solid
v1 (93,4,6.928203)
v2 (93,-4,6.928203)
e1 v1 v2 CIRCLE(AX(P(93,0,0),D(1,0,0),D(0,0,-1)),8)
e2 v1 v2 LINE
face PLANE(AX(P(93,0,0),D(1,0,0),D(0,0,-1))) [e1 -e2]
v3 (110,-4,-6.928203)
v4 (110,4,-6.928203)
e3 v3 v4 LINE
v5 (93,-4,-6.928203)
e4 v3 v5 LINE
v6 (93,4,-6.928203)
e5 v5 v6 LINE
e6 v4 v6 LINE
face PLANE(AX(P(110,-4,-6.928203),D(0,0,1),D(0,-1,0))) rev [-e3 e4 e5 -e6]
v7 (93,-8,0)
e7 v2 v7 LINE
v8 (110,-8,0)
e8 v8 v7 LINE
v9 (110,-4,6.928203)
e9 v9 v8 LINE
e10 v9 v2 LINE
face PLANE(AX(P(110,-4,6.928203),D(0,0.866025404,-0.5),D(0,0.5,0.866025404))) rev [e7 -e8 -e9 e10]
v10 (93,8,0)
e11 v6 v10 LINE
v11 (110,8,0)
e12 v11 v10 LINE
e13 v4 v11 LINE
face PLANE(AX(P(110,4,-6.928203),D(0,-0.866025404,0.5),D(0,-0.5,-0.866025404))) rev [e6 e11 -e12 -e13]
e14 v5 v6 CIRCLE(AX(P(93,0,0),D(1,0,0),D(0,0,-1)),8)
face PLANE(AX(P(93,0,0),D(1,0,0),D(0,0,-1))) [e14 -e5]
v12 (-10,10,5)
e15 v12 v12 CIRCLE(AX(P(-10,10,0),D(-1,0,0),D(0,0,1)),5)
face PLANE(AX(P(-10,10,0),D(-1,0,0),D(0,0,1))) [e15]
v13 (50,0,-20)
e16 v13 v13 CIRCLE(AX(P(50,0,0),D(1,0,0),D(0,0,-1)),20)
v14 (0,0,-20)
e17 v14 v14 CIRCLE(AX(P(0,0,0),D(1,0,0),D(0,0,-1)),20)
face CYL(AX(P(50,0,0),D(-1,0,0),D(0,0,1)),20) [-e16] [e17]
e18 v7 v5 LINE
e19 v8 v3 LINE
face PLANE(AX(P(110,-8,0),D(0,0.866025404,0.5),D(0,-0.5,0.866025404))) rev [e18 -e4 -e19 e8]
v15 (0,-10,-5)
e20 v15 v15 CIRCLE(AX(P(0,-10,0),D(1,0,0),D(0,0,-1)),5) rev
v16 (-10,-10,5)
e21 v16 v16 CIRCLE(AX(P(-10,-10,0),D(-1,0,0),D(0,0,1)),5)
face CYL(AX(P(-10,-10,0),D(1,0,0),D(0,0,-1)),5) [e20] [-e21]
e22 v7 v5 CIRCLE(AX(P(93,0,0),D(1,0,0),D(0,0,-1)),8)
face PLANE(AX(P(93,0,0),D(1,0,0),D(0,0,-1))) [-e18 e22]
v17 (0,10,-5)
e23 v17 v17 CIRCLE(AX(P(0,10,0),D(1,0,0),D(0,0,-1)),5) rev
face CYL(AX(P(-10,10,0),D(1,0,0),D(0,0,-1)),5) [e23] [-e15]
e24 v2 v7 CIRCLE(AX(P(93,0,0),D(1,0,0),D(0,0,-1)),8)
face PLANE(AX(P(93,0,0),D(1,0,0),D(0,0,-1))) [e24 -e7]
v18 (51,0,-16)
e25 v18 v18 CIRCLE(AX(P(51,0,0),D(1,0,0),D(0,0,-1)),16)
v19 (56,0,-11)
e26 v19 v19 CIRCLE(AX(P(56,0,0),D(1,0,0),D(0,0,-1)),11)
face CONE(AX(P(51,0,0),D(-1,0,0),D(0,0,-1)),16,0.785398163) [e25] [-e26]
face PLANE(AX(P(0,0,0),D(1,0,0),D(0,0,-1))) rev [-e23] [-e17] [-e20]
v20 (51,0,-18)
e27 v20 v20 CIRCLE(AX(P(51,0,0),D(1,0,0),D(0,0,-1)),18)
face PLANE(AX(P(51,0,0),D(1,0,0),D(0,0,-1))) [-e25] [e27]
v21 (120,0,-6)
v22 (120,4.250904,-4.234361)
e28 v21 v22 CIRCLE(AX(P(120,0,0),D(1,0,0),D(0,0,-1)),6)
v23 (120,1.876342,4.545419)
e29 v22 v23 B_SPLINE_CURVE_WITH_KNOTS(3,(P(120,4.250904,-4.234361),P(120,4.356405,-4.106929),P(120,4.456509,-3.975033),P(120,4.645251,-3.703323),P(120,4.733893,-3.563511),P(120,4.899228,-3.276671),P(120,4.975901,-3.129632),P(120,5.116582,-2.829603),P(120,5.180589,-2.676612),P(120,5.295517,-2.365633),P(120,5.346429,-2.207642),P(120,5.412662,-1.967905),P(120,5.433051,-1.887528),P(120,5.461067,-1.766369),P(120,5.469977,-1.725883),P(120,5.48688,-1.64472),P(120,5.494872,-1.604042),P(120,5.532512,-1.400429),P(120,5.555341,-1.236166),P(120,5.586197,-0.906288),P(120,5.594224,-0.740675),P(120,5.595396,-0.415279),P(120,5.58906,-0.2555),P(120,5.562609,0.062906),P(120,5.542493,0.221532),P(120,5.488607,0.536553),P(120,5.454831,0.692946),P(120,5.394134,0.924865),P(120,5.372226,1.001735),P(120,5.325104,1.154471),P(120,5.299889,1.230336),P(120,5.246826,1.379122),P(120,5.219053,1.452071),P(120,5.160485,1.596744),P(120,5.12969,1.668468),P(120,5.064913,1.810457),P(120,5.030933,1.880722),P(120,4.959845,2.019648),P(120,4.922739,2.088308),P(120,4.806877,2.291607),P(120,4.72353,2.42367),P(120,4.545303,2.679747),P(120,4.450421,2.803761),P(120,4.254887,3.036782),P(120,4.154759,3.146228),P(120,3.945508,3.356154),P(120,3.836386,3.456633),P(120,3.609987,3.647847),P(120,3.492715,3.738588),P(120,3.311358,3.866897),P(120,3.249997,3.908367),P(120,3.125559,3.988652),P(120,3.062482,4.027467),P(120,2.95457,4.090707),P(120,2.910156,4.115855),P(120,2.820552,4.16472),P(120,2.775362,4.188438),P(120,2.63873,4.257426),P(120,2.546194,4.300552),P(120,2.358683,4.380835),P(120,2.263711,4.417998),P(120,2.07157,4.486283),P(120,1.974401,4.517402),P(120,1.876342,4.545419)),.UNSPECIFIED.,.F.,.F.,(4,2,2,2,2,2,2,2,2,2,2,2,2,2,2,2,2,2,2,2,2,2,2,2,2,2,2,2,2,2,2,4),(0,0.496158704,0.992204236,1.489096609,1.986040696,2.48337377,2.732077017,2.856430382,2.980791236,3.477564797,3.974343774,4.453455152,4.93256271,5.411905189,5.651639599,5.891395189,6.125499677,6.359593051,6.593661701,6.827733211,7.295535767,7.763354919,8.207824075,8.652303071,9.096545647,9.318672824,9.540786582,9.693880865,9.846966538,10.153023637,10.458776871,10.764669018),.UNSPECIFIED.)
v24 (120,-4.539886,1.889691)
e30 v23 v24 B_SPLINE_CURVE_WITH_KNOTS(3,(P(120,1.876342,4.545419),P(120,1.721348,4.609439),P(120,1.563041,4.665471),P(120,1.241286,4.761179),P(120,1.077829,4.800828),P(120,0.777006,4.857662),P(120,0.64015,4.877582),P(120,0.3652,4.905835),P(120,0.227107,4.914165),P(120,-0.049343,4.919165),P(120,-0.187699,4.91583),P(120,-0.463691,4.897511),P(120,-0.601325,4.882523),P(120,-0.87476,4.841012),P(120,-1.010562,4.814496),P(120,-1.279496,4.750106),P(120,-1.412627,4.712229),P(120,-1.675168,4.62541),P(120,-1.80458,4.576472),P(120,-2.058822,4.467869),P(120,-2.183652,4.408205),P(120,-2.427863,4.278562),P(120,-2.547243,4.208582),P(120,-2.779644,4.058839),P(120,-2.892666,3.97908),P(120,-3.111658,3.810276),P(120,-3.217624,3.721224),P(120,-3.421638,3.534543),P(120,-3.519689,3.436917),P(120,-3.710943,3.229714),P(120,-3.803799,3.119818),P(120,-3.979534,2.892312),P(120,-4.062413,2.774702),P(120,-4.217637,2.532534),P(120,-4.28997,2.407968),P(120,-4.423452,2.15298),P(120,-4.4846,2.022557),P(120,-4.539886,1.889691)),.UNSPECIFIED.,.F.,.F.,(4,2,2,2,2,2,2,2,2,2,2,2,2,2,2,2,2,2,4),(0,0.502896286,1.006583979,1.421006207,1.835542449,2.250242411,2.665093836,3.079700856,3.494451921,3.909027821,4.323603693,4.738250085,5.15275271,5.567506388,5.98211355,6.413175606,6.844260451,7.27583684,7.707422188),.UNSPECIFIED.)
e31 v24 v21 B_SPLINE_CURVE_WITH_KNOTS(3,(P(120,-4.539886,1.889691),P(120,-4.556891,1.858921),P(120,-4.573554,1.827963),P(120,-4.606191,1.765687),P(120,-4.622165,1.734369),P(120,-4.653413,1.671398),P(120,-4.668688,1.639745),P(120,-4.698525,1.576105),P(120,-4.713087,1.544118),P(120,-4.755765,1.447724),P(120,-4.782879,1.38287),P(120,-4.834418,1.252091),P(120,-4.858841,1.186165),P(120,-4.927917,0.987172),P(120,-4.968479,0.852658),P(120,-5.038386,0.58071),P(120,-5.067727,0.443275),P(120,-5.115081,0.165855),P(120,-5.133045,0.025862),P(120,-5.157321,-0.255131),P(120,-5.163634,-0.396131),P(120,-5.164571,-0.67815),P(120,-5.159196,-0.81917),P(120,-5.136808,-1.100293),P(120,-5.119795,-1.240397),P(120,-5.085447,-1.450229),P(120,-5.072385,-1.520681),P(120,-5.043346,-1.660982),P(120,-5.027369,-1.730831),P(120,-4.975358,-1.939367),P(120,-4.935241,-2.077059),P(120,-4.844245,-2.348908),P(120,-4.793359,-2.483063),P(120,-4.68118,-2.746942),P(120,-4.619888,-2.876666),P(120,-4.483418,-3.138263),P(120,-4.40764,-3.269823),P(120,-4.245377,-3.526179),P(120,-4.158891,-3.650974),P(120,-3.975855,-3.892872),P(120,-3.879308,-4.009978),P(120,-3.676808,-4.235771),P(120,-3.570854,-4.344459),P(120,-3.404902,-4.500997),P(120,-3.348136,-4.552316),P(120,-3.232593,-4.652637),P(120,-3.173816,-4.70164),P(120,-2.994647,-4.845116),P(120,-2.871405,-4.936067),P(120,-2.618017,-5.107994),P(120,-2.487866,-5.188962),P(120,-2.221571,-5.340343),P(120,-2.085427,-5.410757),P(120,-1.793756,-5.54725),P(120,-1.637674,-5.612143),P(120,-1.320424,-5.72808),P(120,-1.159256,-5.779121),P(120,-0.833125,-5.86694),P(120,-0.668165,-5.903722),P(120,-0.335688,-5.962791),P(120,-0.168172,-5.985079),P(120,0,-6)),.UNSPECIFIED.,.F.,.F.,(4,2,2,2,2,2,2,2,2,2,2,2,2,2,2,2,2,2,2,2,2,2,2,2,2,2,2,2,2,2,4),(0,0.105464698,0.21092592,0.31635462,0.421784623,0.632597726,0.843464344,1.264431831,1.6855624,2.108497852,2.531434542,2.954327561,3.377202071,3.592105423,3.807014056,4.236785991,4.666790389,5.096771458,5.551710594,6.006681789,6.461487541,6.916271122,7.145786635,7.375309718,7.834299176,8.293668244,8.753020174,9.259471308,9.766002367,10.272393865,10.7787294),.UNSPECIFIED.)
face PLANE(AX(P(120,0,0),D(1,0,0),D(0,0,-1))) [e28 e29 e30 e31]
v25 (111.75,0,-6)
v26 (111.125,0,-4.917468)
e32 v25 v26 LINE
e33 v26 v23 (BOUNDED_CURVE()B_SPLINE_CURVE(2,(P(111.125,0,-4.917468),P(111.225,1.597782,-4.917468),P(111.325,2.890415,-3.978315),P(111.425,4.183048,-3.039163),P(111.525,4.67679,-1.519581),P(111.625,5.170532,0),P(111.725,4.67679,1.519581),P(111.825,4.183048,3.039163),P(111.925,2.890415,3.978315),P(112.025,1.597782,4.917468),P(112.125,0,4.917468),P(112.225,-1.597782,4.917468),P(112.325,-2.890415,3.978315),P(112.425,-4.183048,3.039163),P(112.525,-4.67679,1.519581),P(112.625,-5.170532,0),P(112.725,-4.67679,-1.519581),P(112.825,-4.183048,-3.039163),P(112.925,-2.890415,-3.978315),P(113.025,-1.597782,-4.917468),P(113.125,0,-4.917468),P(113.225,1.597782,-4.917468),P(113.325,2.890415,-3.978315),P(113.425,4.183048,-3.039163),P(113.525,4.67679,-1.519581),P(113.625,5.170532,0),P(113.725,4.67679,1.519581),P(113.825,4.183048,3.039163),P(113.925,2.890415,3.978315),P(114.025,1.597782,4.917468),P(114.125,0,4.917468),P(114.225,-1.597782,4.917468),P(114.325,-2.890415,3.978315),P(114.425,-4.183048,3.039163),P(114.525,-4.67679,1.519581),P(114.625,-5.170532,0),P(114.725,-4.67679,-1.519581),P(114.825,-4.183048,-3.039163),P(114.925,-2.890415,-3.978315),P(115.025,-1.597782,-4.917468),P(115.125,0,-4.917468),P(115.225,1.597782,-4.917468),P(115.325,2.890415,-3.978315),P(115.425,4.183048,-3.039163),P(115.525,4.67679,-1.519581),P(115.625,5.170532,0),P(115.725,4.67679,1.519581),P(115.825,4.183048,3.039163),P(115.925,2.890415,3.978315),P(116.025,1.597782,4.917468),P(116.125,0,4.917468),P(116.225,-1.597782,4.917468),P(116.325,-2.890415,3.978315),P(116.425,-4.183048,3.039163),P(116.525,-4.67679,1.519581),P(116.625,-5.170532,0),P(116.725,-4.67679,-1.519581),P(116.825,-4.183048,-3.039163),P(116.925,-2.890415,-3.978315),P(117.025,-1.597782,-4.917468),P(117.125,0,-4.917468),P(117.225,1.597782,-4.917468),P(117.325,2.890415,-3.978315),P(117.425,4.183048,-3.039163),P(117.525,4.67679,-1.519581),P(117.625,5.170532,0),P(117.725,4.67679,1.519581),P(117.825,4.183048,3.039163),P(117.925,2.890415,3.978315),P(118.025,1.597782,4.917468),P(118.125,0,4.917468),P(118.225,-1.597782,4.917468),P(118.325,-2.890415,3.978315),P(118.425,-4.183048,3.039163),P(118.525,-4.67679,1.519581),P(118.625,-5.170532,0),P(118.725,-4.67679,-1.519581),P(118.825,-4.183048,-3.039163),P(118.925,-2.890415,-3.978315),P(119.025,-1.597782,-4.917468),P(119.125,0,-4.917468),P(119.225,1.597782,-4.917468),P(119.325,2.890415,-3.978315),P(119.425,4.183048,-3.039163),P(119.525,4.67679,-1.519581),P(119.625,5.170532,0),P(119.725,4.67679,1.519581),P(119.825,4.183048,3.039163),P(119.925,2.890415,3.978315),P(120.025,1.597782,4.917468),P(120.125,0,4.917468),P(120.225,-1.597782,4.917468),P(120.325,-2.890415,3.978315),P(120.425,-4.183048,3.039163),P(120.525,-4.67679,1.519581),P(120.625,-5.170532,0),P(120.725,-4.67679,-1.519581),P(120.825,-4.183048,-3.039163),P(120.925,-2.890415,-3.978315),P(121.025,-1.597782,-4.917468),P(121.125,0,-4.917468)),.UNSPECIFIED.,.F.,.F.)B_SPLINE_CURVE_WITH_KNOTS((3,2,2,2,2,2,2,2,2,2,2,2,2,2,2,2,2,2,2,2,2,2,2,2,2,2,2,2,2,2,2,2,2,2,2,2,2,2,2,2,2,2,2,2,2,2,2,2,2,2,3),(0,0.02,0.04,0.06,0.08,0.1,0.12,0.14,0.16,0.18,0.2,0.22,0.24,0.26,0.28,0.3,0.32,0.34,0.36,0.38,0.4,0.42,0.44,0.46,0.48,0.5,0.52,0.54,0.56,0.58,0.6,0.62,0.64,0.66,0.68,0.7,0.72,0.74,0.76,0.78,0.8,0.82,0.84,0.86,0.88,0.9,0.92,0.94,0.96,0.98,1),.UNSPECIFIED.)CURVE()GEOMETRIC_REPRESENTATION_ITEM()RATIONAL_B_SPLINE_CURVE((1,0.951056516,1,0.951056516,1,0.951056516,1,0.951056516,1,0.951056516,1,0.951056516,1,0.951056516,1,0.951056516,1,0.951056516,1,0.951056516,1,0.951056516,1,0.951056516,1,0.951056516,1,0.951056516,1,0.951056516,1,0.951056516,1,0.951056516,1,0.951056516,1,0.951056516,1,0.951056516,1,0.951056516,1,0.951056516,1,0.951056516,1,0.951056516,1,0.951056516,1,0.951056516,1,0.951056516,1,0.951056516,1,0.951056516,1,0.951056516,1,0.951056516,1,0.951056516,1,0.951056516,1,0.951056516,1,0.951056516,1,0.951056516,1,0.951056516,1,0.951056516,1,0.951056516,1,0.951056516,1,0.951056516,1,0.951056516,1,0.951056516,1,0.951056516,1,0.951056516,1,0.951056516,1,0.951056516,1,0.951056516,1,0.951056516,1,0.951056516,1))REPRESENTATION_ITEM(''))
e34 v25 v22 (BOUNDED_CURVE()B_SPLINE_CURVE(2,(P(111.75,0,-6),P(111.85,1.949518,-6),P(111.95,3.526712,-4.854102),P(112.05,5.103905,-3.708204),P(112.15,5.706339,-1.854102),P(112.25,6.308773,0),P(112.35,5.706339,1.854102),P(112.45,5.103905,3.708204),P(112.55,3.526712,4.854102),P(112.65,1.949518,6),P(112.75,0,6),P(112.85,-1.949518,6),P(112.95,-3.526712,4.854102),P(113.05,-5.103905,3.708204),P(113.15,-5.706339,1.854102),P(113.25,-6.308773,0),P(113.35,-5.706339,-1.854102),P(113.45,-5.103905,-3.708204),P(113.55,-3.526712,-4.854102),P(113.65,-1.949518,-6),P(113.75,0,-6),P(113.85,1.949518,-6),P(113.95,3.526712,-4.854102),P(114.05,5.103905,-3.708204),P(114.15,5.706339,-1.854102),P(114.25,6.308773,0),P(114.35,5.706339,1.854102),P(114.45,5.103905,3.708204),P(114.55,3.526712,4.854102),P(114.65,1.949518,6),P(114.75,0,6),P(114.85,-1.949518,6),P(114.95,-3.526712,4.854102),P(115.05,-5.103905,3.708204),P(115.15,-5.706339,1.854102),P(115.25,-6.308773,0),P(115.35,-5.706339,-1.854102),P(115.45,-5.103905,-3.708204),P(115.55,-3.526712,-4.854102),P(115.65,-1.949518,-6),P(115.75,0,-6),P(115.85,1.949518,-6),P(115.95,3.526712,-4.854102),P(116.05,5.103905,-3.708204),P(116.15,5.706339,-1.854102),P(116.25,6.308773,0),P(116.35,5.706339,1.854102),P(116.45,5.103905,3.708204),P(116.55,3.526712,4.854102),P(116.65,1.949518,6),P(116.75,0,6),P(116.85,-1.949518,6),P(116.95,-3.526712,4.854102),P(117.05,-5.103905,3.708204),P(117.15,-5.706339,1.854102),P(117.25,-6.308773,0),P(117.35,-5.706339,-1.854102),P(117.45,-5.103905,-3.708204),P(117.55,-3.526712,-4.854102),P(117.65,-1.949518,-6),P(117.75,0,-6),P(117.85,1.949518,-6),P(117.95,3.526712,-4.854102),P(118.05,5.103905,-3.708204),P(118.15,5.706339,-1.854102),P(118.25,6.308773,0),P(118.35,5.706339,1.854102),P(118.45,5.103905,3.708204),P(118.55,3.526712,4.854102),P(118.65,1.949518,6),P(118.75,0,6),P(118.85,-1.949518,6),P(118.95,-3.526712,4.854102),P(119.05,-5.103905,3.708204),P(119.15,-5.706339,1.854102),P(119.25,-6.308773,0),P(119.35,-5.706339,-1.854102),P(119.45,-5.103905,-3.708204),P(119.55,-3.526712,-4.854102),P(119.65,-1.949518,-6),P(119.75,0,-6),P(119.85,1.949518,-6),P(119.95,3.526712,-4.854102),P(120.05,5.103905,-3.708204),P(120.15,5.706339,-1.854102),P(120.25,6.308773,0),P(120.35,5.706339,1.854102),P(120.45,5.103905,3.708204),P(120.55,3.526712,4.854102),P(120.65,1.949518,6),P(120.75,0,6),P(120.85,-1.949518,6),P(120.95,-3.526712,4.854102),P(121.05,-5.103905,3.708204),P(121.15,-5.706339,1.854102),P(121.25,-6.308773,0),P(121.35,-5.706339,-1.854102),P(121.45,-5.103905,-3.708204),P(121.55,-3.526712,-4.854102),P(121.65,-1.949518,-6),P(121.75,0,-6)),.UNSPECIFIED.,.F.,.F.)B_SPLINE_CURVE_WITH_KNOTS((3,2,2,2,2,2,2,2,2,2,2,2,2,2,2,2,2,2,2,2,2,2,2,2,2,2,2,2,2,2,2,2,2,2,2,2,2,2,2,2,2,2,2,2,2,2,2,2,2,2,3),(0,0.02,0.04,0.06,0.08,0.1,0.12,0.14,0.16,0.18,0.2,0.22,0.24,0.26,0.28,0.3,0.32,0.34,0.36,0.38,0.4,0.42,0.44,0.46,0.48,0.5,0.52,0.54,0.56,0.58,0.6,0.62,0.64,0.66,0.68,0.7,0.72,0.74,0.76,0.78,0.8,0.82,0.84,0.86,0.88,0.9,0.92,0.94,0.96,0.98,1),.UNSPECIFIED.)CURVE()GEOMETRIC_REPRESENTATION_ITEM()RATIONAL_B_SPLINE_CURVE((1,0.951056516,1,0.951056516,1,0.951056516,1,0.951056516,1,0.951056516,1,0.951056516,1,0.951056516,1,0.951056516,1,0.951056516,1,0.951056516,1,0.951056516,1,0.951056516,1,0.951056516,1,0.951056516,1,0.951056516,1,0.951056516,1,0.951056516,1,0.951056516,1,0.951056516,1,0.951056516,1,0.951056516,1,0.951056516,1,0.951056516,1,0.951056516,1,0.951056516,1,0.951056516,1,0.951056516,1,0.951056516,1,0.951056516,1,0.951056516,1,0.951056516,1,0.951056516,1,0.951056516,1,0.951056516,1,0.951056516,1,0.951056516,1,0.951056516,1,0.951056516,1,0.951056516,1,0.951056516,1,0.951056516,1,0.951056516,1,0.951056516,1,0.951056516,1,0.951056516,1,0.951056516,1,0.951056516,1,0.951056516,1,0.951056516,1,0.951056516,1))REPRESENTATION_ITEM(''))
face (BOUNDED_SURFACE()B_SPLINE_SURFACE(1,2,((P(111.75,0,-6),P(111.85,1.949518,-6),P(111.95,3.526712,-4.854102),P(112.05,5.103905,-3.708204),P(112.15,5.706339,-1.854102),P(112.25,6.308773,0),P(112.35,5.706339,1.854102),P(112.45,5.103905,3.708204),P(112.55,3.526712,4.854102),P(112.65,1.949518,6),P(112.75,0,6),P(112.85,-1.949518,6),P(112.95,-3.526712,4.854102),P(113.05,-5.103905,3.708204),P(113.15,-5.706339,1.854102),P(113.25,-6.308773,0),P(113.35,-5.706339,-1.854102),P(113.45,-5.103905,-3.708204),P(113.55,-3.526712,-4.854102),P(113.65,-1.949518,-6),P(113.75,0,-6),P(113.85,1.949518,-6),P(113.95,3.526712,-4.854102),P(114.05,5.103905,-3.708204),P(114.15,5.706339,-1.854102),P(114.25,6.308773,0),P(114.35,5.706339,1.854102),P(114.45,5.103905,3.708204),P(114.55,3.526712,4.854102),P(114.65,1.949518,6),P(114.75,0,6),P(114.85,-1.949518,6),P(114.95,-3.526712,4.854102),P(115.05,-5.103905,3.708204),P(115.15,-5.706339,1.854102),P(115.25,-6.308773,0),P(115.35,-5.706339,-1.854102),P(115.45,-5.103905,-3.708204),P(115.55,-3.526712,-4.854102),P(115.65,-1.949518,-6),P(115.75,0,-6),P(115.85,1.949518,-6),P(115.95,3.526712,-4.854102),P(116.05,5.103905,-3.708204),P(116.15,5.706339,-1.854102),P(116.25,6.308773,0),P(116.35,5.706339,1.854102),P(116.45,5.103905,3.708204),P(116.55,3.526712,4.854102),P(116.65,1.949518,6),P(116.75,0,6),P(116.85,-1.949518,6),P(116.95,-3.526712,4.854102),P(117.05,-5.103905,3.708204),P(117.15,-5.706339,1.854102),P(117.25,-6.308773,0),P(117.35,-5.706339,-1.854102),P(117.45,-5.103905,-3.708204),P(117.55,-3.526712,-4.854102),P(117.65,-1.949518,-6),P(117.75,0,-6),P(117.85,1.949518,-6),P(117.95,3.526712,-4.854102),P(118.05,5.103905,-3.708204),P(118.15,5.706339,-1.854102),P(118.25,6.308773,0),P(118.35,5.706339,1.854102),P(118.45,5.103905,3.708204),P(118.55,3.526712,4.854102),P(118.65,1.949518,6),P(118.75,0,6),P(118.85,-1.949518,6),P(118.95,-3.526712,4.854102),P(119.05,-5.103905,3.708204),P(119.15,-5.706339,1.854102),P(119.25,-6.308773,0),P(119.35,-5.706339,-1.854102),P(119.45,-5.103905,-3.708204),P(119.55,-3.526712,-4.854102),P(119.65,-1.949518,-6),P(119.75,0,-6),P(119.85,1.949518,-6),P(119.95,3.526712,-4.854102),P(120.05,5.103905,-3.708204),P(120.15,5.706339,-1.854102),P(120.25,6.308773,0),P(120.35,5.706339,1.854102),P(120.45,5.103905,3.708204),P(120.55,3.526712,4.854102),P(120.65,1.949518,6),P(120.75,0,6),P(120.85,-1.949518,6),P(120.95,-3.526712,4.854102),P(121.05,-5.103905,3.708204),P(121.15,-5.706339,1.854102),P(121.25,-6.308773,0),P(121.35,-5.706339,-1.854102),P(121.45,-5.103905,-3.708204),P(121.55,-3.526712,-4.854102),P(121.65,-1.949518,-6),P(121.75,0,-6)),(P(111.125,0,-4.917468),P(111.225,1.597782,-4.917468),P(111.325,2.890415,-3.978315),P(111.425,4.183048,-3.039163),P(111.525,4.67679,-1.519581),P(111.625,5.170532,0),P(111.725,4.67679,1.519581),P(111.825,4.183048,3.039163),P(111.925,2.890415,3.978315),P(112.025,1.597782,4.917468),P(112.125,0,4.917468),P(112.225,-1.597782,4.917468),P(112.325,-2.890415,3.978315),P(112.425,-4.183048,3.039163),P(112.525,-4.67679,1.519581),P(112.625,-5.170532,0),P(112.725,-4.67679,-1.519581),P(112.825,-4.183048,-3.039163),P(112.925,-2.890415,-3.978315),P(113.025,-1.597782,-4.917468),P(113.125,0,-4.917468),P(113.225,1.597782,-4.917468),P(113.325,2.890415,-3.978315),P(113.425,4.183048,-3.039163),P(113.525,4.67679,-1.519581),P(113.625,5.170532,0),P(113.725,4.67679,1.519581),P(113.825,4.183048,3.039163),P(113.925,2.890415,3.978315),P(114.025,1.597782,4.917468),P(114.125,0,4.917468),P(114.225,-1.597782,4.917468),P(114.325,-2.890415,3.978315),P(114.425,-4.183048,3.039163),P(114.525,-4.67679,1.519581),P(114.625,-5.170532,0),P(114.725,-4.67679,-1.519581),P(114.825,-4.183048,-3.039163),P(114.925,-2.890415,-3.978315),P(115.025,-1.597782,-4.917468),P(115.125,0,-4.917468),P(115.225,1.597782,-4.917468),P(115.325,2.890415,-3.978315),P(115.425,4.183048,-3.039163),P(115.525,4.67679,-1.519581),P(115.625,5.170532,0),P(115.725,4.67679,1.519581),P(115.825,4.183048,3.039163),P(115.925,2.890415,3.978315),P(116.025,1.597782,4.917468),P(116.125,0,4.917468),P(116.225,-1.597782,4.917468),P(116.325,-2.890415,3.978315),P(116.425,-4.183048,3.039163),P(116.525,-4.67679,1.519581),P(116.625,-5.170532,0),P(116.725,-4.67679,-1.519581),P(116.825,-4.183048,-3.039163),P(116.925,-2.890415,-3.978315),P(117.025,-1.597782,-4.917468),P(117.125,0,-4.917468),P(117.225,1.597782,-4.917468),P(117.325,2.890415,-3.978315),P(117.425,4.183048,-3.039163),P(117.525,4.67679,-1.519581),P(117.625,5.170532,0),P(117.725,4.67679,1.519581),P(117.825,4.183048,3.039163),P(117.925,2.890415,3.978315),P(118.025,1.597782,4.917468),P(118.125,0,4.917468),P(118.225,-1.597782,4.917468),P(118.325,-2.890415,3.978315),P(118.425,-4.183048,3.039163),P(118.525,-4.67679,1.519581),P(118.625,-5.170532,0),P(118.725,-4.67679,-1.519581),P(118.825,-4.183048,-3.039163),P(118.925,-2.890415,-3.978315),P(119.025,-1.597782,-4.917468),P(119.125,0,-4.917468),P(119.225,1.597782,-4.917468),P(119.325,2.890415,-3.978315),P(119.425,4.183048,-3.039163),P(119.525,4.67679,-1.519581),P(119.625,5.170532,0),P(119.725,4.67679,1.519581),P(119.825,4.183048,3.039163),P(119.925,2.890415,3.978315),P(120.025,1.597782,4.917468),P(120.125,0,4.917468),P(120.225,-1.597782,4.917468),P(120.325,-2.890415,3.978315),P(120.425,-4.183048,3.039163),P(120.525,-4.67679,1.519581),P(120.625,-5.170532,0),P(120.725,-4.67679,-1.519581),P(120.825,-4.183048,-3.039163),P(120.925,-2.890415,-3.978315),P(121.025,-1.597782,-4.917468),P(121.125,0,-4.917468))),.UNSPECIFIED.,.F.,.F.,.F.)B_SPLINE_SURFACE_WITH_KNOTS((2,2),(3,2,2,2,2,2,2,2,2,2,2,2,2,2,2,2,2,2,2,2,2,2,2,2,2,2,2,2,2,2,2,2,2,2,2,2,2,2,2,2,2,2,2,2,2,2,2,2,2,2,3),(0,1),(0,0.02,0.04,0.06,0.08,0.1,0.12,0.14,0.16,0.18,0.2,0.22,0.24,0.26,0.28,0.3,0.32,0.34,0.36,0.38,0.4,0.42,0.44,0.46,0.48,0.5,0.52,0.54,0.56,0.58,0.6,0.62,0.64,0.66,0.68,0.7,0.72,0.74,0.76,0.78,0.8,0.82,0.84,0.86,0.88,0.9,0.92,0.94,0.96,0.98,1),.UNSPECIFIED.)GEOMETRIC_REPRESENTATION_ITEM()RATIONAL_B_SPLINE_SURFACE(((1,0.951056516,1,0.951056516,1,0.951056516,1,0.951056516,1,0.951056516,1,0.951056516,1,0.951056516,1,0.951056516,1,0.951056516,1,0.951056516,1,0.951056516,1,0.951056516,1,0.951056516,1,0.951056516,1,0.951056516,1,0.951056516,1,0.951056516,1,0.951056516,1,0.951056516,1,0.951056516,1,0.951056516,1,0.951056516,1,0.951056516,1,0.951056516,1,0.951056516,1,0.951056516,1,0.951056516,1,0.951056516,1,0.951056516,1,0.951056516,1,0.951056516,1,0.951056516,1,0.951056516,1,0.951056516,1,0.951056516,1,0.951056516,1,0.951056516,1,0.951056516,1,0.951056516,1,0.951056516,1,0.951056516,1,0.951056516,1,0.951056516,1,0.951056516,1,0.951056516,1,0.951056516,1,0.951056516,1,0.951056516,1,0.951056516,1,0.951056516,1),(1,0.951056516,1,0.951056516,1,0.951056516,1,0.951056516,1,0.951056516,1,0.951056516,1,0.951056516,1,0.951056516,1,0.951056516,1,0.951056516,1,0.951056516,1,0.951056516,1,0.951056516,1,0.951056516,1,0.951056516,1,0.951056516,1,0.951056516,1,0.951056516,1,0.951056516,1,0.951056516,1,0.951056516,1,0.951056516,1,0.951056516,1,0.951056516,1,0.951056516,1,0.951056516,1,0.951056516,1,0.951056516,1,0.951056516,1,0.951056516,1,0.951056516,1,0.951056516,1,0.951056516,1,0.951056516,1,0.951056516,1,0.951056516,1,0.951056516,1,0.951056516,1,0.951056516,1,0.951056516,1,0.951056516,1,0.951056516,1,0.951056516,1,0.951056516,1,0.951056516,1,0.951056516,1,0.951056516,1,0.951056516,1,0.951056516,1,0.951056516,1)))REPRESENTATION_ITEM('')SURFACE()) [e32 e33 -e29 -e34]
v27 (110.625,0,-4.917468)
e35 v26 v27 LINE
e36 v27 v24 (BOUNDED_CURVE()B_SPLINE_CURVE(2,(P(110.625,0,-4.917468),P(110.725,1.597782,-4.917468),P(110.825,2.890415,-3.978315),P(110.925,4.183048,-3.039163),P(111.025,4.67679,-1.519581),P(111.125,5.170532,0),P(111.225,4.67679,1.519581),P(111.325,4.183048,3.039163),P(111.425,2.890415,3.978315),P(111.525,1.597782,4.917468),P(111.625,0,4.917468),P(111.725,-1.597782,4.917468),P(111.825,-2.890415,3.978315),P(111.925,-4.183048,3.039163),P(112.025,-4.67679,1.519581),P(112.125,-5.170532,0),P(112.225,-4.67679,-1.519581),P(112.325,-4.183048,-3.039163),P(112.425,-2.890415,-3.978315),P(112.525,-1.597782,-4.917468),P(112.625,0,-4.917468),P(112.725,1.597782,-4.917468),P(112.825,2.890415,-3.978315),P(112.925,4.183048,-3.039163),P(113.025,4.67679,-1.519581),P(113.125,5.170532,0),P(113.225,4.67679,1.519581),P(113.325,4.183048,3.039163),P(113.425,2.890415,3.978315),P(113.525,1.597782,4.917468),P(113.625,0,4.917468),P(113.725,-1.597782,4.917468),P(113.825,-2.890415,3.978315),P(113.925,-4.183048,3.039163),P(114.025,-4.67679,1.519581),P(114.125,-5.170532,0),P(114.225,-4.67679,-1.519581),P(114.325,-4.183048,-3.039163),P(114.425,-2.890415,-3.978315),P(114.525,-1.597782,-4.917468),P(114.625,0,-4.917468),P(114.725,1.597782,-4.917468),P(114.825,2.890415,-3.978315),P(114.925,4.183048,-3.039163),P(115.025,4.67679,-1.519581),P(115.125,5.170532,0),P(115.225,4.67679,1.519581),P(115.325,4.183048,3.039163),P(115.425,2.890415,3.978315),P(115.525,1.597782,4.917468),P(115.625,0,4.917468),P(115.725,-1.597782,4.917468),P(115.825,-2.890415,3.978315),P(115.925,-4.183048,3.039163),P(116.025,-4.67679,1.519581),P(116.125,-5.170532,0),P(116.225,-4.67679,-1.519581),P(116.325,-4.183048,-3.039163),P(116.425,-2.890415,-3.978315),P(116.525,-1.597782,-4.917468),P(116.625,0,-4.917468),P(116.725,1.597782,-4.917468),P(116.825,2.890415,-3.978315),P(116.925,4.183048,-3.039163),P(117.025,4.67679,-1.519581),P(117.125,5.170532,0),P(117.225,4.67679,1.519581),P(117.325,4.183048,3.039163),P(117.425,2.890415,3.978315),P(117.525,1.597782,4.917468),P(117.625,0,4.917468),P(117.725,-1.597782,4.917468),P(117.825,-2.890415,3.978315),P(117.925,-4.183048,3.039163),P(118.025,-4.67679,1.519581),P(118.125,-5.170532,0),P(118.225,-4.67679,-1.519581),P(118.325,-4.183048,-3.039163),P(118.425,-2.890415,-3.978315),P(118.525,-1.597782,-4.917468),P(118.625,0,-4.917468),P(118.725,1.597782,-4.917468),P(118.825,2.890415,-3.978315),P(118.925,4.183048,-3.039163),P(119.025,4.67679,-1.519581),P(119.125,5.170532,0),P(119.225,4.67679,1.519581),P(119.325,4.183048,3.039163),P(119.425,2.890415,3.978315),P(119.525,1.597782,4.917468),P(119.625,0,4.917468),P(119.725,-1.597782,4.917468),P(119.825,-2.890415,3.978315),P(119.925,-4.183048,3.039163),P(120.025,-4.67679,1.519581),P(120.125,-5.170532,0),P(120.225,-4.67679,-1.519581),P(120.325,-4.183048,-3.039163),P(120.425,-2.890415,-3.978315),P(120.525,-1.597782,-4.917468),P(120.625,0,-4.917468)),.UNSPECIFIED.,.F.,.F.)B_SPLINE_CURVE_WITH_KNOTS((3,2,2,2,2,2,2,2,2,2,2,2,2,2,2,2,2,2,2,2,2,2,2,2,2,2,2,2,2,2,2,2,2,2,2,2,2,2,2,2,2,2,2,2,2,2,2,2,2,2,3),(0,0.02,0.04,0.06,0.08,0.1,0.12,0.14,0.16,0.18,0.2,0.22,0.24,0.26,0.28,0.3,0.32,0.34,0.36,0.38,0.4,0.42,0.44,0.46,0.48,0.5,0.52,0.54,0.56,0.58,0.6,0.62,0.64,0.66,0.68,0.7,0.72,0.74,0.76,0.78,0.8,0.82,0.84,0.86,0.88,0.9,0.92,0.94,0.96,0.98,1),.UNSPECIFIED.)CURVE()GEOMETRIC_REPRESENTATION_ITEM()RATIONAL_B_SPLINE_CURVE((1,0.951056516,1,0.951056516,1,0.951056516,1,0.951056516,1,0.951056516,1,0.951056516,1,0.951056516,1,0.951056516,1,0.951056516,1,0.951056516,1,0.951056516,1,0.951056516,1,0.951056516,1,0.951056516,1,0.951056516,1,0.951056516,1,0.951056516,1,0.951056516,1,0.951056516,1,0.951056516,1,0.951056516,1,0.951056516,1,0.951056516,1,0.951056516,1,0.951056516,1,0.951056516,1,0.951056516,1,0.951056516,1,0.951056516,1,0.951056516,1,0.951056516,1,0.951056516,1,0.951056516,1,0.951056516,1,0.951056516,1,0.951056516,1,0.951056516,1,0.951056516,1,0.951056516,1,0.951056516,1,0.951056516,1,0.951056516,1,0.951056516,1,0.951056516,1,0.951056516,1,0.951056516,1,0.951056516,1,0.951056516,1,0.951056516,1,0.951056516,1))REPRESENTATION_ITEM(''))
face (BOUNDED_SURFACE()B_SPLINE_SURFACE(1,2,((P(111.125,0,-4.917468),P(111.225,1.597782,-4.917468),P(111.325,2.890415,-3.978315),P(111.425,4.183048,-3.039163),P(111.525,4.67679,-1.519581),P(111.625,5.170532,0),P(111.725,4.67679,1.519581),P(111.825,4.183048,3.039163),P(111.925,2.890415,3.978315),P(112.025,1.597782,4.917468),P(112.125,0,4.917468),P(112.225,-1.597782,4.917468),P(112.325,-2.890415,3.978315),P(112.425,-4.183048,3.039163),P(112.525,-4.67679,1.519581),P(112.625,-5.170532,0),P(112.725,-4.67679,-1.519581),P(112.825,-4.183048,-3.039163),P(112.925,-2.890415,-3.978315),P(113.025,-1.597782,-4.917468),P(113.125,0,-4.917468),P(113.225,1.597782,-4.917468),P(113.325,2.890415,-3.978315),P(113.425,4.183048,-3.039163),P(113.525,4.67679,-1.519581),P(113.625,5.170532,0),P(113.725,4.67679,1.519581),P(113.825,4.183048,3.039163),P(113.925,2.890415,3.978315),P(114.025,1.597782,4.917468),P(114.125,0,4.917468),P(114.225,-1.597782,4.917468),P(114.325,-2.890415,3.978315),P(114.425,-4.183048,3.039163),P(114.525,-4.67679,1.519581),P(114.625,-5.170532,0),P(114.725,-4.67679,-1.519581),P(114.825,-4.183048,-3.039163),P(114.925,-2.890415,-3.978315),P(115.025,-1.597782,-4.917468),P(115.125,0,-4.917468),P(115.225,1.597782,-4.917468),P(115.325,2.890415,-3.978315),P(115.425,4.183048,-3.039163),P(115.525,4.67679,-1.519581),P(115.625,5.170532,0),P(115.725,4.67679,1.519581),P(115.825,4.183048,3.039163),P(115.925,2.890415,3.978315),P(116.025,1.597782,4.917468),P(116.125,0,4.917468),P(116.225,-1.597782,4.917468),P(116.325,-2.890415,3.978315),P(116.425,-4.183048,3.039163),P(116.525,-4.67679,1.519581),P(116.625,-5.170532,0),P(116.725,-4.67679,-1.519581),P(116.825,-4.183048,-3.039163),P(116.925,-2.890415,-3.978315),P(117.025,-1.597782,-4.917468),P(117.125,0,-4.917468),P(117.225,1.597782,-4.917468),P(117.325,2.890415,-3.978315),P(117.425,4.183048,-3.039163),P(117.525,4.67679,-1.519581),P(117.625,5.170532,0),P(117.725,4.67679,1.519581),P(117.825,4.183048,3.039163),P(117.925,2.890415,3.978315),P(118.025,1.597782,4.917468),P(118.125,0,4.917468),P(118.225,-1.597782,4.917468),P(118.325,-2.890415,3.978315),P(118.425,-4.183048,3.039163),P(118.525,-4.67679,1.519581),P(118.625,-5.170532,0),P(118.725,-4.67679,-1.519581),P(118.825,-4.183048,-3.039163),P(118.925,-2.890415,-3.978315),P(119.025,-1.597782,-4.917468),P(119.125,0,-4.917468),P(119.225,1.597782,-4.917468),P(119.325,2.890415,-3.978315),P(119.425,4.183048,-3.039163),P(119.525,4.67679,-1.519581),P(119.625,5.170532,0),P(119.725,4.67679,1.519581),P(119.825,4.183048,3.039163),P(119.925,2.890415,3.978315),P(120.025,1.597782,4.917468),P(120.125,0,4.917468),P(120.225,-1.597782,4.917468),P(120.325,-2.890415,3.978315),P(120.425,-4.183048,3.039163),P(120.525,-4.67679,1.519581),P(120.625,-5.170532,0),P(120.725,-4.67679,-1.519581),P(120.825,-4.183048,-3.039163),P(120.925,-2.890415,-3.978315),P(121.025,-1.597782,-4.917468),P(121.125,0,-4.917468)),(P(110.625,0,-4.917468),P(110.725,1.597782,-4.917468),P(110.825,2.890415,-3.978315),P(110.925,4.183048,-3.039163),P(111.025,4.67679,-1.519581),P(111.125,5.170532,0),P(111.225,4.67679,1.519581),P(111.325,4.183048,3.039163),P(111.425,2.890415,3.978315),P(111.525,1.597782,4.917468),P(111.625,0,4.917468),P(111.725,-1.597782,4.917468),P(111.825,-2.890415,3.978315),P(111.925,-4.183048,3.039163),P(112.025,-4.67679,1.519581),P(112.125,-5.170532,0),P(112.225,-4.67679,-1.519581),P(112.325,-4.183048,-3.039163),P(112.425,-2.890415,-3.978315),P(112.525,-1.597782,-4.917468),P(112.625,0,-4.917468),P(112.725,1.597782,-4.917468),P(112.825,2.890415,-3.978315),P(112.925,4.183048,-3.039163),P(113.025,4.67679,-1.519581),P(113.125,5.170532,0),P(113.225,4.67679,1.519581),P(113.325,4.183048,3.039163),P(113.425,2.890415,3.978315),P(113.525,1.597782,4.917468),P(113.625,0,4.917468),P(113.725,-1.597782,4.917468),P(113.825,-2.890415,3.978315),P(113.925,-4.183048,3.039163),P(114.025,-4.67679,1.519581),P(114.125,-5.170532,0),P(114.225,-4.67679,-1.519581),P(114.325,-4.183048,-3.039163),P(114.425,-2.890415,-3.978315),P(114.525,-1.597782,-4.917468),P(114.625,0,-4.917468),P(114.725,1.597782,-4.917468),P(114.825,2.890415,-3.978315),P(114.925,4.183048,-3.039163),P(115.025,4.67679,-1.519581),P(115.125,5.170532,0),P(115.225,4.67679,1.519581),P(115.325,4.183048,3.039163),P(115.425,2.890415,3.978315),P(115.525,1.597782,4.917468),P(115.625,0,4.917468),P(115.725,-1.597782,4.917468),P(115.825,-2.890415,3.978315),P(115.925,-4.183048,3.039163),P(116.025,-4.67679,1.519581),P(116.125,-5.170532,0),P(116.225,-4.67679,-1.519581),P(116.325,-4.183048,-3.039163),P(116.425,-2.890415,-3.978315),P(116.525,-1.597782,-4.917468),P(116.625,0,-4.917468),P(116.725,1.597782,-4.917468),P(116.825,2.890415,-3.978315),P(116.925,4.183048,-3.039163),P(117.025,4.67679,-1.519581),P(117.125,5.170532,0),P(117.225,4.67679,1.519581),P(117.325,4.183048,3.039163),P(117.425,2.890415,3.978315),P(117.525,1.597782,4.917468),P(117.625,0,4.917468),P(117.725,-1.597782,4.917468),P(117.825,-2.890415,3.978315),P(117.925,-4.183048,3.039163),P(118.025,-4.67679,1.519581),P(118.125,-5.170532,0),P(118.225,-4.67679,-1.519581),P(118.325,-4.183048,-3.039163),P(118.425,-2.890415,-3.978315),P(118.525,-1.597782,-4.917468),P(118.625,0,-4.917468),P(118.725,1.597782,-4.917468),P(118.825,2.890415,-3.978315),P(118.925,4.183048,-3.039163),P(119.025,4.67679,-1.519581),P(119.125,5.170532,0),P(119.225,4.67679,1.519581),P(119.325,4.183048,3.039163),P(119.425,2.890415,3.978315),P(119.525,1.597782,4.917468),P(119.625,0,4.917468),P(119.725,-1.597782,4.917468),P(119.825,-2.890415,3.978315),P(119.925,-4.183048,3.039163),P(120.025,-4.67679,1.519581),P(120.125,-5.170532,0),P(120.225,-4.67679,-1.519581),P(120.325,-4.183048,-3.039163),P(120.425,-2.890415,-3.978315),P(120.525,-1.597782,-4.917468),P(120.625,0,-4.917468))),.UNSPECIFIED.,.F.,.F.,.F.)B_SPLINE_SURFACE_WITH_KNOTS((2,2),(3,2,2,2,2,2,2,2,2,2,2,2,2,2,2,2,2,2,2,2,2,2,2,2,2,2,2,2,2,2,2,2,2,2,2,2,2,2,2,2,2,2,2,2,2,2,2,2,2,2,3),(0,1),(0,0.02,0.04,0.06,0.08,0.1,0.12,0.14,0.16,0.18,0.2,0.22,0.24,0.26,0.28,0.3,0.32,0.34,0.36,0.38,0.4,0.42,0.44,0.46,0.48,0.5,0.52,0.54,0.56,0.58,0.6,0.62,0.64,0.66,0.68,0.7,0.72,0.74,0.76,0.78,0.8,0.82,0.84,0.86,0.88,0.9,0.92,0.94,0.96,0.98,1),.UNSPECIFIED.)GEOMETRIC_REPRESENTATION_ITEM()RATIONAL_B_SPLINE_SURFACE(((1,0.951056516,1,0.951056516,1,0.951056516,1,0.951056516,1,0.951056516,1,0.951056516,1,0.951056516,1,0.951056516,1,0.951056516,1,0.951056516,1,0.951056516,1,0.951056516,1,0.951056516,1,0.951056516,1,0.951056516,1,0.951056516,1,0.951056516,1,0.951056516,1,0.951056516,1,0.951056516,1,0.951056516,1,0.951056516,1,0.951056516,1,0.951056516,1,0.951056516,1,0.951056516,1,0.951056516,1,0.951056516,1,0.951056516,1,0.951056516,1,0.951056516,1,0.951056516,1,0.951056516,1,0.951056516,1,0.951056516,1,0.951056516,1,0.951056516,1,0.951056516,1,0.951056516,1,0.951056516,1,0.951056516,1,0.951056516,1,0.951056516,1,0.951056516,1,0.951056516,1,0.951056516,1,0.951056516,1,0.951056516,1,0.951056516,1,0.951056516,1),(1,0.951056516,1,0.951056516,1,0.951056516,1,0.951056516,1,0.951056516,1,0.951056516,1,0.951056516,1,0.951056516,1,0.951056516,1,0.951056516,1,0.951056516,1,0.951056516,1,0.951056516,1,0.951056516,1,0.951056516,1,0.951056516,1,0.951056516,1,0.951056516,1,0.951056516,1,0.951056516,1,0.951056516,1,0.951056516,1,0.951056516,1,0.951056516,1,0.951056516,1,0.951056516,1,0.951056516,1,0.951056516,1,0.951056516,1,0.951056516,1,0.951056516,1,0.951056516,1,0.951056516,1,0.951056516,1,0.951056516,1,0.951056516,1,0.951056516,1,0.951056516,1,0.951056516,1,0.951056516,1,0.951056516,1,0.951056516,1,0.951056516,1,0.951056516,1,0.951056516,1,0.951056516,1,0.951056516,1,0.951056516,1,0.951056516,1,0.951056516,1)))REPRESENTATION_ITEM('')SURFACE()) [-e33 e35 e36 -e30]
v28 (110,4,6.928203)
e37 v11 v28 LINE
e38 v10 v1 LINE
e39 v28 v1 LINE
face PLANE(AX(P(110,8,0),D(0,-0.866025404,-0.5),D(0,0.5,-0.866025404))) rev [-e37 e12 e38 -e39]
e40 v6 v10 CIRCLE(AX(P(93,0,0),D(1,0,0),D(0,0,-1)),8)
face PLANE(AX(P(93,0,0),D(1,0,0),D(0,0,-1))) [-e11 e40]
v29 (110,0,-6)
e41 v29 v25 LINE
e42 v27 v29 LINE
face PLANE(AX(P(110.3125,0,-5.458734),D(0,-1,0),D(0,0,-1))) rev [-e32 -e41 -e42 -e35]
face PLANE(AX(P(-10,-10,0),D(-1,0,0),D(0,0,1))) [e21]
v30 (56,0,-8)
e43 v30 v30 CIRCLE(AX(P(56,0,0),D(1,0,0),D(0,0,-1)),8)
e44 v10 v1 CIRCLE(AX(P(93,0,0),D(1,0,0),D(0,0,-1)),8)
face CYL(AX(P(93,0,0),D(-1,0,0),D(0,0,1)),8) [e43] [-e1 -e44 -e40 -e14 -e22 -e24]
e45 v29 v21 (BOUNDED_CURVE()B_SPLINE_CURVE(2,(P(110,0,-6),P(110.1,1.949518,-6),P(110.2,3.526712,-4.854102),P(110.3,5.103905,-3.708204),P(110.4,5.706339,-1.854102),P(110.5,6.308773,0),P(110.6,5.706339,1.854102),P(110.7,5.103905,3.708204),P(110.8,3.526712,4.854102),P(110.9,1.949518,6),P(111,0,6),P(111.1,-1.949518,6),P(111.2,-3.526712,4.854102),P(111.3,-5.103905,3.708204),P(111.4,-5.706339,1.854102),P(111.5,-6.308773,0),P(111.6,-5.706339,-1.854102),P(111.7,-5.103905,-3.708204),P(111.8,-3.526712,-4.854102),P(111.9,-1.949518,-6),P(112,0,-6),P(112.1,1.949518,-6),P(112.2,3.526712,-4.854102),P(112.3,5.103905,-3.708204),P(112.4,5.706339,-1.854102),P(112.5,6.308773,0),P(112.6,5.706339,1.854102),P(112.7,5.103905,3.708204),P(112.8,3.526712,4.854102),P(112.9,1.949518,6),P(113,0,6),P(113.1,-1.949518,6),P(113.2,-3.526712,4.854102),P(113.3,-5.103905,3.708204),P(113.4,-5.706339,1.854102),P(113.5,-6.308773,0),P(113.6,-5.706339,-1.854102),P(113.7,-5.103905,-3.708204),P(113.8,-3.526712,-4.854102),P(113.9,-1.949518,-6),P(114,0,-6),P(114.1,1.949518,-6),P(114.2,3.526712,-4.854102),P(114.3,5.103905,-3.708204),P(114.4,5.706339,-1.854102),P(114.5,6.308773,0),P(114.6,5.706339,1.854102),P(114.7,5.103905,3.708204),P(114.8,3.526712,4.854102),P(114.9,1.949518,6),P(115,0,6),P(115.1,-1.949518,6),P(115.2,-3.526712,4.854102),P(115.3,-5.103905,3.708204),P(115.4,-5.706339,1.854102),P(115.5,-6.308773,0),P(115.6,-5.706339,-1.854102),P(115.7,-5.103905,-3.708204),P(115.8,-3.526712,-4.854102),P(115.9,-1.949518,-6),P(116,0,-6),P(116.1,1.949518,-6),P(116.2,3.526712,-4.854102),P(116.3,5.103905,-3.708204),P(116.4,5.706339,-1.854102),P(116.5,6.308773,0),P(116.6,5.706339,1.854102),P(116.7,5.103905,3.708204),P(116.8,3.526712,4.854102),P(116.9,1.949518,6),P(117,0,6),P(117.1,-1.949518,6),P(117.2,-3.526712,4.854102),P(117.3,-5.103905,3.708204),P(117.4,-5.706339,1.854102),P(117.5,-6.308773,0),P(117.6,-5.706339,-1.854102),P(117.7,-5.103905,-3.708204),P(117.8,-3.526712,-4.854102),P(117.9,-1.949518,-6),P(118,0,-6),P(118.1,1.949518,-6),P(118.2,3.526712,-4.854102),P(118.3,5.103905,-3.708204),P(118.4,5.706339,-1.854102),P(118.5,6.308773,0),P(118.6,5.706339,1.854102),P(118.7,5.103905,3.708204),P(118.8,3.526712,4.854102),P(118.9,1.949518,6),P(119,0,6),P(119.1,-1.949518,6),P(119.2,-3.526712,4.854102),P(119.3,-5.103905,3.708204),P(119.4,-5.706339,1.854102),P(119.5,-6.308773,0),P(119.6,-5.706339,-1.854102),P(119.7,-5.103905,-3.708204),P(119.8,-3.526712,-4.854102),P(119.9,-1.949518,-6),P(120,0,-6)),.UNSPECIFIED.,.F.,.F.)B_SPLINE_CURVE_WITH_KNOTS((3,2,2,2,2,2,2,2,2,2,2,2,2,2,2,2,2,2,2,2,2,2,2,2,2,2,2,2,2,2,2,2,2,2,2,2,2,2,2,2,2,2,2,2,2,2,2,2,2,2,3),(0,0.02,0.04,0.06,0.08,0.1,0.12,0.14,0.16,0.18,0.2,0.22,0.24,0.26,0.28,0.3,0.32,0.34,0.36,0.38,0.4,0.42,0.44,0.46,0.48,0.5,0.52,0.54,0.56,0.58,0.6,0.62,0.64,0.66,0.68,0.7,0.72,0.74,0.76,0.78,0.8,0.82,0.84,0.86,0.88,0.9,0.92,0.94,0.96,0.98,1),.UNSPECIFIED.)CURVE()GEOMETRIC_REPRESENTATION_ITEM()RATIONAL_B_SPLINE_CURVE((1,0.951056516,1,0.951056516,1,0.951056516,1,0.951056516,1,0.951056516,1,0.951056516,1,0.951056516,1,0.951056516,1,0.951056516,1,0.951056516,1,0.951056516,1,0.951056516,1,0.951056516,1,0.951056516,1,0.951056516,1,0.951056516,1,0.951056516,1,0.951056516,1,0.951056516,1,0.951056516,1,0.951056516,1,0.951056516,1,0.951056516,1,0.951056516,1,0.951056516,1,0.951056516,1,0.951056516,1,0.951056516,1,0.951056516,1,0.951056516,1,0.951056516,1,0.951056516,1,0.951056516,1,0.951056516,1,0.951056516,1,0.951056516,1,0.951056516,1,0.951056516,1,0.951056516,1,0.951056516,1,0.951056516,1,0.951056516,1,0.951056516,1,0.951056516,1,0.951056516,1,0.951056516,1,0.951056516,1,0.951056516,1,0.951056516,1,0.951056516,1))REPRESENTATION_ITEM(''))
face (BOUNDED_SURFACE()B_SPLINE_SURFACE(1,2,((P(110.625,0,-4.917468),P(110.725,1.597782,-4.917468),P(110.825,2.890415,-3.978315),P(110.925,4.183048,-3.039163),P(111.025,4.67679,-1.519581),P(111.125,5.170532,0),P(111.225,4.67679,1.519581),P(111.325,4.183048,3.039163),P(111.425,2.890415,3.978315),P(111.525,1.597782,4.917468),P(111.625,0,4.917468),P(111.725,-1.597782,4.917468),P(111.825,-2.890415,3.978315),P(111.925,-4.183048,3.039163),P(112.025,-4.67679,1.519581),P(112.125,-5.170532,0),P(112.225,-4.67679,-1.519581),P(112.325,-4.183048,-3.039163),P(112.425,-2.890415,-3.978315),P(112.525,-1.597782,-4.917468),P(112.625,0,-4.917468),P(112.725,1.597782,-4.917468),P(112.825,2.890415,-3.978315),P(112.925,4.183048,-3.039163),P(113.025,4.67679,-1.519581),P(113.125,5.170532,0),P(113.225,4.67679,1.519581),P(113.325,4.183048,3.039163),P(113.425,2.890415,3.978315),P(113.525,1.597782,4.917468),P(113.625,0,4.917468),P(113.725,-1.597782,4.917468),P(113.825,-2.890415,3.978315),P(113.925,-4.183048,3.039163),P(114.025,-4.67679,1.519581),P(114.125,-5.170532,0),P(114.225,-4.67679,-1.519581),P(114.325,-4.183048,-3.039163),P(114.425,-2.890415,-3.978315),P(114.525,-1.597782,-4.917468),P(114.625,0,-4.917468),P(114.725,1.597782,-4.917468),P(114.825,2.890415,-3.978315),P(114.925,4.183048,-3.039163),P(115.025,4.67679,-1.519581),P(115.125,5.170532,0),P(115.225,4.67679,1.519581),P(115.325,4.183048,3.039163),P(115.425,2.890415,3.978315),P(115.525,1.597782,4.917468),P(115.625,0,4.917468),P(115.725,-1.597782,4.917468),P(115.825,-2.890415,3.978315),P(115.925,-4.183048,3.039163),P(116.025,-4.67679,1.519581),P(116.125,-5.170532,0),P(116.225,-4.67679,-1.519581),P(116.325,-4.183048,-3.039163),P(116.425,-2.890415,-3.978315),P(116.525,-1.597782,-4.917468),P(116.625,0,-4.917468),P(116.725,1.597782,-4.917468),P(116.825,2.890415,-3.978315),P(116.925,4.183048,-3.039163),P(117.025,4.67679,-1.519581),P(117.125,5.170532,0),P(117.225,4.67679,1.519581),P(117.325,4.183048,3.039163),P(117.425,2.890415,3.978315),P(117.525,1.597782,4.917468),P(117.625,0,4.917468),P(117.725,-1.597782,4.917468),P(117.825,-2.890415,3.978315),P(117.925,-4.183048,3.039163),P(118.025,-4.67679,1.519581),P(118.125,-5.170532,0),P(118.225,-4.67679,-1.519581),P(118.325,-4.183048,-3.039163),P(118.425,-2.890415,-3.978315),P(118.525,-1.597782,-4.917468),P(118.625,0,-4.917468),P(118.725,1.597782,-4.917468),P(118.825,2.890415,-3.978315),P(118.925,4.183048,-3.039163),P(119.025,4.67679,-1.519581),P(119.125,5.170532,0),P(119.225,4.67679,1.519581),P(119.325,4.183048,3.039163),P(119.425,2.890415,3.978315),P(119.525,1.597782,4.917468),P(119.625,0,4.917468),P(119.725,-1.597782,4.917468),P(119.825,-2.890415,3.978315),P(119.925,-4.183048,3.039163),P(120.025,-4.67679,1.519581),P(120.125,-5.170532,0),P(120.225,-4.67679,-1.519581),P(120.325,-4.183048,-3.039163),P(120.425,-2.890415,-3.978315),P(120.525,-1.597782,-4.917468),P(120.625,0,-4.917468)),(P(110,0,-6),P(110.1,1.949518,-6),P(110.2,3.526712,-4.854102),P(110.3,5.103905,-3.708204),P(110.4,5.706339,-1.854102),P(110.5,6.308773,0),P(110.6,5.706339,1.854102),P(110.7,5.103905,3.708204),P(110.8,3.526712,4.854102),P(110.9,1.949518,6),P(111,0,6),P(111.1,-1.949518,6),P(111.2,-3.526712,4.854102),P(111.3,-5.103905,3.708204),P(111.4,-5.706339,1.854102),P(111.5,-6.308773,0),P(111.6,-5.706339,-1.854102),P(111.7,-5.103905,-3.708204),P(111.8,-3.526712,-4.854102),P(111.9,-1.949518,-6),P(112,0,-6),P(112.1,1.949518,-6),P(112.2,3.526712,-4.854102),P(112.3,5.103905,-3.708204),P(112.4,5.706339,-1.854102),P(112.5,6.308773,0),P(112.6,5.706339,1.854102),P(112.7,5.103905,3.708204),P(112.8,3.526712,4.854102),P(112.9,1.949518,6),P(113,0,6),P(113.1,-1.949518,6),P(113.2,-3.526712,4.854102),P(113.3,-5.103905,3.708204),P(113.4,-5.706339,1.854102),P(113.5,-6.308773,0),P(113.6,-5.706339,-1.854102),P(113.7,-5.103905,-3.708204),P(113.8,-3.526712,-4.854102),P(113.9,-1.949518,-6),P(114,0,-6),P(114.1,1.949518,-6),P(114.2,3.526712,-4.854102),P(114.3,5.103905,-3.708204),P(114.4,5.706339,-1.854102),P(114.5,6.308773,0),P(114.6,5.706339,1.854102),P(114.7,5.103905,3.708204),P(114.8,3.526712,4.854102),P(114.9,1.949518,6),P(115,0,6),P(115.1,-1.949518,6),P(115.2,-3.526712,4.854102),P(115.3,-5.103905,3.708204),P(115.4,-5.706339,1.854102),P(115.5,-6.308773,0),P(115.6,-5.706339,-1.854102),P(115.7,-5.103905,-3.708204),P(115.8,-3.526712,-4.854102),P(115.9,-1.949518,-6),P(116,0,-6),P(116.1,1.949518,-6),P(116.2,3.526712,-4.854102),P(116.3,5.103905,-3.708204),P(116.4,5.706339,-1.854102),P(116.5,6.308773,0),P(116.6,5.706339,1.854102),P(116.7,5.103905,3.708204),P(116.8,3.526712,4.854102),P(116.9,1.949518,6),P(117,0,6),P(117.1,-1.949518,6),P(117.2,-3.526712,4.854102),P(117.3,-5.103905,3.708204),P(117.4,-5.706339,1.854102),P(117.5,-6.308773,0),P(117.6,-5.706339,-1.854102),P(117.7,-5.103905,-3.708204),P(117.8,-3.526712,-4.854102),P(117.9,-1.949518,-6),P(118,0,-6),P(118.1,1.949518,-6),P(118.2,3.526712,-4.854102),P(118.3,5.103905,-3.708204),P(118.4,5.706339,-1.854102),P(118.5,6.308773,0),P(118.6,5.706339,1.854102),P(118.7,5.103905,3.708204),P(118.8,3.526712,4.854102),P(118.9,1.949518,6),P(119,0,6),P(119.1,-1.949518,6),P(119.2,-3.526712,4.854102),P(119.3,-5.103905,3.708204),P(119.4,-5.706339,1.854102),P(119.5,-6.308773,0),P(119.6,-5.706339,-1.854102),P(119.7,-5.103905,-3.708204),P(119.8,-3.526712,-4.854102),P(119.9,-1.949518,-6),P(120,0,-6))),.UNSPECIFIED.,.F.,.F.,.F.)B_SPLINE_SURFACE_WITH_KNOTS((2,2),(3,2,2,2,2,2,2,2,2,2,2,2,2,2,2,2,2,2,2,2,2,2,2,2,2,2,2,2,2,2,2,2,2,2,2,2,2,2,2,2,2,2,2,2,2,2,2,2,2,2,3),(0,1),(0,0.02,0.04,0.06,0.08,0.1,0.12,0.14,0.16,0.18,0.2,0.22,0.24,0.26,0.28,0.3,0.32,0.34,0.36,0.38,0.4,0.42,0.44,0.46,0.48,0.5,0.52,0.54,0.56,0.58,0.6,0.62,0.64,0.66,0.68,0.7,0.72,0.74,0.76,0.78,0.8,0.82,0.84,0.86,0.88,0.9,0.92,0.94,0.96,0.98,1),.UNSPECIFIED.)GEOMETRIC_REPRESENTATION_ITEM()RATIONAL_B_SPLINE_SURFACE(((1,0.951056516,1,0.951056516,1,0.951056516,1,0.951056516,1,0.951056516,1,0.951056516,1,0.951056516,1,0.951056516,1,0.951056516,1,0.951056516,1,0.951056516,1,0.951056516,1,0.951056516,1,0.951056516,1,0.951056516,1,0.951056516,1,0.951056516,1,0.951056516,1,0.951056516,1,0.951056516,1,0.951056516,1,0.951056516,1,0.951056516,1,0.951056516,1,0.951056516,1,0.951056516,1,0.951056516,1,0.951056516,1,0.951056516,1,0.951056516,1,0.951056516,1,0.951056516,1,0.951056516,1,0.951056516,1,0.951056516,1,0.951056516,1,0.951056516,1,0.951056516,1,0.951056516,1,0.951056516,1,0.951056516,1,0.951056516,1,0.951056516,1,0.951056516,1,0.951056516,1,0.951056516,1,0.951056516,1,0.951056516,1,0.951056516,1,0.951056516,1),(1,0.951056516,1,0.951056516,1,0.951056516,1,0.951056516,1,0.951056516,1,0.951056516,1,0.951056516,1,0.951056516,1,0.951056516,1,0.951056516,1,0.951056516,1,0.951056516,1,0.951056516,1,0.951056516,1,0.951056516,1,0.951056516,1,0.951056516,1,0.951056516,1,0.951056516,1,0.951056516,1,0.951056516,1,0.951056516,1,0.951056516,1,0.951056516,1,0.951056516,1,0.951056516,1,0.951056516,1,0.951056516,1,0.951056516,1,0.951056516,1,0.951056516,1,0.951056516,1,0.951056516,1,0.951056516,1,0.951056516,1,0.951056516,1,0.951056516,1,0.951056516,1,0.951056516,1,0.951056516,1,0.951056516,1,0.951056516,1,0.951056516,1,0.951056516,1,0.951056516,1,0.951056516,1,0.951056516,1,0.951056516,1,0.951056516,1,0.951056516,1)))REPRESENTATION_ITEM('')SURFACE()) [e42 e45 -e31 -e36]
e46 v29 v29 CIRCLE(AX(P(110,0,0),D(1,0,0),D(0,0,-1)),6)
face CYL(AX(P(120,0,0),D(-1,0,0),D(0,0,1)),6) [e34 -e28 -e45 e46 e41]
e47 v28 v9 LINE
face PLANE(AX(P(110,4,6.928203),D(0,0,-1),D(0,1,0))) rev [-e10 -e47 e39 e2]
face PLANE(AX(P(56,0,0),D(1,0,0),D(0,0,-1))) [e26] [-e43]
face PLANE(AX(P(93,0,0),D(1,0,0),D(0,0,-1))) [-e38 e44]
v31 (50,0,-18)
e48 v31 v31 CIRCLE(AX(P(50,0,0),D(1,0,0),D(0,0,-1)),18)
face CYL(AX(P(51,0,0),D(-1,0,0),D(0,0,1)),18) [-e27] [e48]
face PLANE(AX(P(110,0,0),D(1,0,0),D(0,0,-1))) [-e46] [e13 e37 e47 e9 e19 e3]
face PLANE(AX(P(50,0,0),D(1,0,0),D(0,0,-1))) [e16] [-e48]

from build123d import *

# Parameters (mm, degrees)
SKETCH1_R           = 20
BOSS_EXTRUDE1_DEPTH = 50
SKETCH2_R           = 5
BOSS_EXTRUDE2_DEPTH = 10
SKETCH3_R           = 18
BOSS_EXTRUDE3_DEPTH = 1
SKETCH4_R           = 16
BOSS_EXTRUDE4_DEPTH = 5
BOSS_EXTRUDE4_TAPER = 45
SKETCH5_R           = 8
BOSS_EXTRUDE5_DEPTH = 37
BOSS_EXTRUDE6_DEPTH = 17
SKETCH7_R           = 6
BOSS_EXTRUDE7_DEPTH = 10
THREAD1_PITCH       = 2


with BuildPart() as part:
    # Sketch1 → Boss-Extrude1 (new body)
    with BuildSketch(Plane(origin=(0, 0, 0), x_dir=(0, 0, -1), z_dir=(1, 0, 0))):
        Circle(SKETCH1_R)
    extrude(amount=BOSS_EXTRUDE1_DEPTH)

    # Sketch2 → Boss-Extrude2 (add)
    with BuildSketch(Plane.ZY):
        with Locations(Location((0, 10, 0), (0, 0, 180))):
            Circle(SKETCH2_R)
        with Locations(Location((0, -10, 0), (0, 0, 180))):
            Circle(SKETCH2_R)
    extrude(amount=BOSS_EXTRUDE2_DEPTH)

    # Sketch3 → Boss-Extrude3 (add)
    with BuildSketch(Plane(origin=(50, 0, 0), x_dir=(0, 0, -1), z_dir=(1, 0, 0))):
        Circle(SKETCH3_R)
    extrude(amount=BOSS_EXTRUDE3_DEPTH)

    # Sketch4 → Boss-Extrude4 (add)
    with BuildSketch(Plane(origin=(51, 0, 0), x_dir=(0, 0, -1), z_dir=(1, 0, 0))):
        Circle(SKETCH4_R)
    extrude(amount=BOSS_EXTRUDE4_DEPTH, taper=BOSS_EXTRUDE4_TAPER)

    # Sketch5 → Boss-Extrude5 (add)
    with BuildSketch(Plane(origin=(56, 0, 0), x_dir=(0, 0, -1), z_dir=(1, 0, 0))):
        Circle(SKETCH5_R)
    extrude(amount=BOSS_EXTRUDE5_DEPTH)

    # Sketch6 → Boss-Extrude6 (add)
    with BuildSketch(Plane(origin=(93, 0, 0), x_dir=(0, 0, -1), z_dir=(1, 0, 0))):
        Polygon((6.92820323, 4), (0, 8), (-6.92820323, 4), (-6.92820323, -4), (0, -8), (6.92820323, -4), align=None)
    extrude(amount=BOSS_EXTRUDE6_DEPTH)

    # Sketch7 → Boss-Extrude7 (add)
    with BuildSketch(Plane(origin=(110, 0, 0), x_dir=(0, 0, -1), z_dir=(1, 0, 0))):
        Circle(SKETCH7_R)
    extrude(amount=BOSS_EXTRUDE7_DEPTH)

    # Thread1: the profile of Thread Profile1 profile screwed along a right-hand helix of 5 turns, 10 arcs to a turn; built about Z, then put on its axis
    thread1_z = Axis((0, 0, 0), (0, 0, 1))
    thread1_corners = [(6.0003, 0, -0.000173205), (6.0003, 0, 1.7501732), (4.91746825, 0, 1.124999997), (4.91746825, 0, 0.624999997)]
    with BuildLine(mode=Mode.PRIVATE) as thread1_profile:
        Line(thread1_corners[0], thread1_corners[1])
        Line(thread1_corners[1], thread1_corners[2])
        Line(thread1_corners[2], thread1_corners[3])
        Line(thread1_corners[3], thread1_corners[0])
    thread1_cap = Face(thread1_profile.wire())
    thread1_turn_angles = [0, 18, 36, 54, 72, 90, 108, 126, 144, 162, 180, 198, 216, 234, 252, 270, 288, 306, 324, 342, 360]
    thread1_turn_weights = [1, 0.9510565162951535, 1, 0.9510565162951535, 1, 0.9510565162951535, 1, 0.9510565162951535, 1, 0.9510565162951535, 1, 0.9510565162951535, 1, 0.9510565162951535, 1, 0.9510565162951535, 1, 0.9510565162951535, 1, 0.9510565162951535, 1]
    thread1_turn_rails = [Edge.make_bspline([Vector(p[0], p[1], 0).rotate(thread1_z, thread1_turn_angles[k]) / thread1_turn_weights[k] + Vector(0, 0, p[2] + THREAD1_PITCH * thread1_turn_angles[k] / 360) for k in range(21)], [0, 0, 0, 1, 1, 2, 2, 3, 3, 4, 4, 5, 5, 6, 6, 7, 7, 8, 8, 9, 9, 10, 10, 10], 2, thread1_turn_weights) for p in thread1_corners]
    thread1_turn_sides = [Face.make_surface_from_curves(thread1_turn_rails[p[0]], thread1_turn_rails[p[1]]) for p in [(0, 1), (1, 2), (2, 3), (3, 0)]]
    thread1 = Plane(origin=(110, 0, 0), x_dir=(0, 0, -1), z_dir=(1, 0, 0)) * Solid(Shell([*[p.moved(Location((0, 0, THREAD1_PITCH * i))) for i in range(5) for p in thread1_turn_sides], thread1_cap, thread1_cap.rotate(thread1_z, 1800).moved(Location((0, 0, THREAD1_PITCH * 1800 / 360)))]))
    add(thread1, mode=Mode.SUBTRACT)


solid = part.part
